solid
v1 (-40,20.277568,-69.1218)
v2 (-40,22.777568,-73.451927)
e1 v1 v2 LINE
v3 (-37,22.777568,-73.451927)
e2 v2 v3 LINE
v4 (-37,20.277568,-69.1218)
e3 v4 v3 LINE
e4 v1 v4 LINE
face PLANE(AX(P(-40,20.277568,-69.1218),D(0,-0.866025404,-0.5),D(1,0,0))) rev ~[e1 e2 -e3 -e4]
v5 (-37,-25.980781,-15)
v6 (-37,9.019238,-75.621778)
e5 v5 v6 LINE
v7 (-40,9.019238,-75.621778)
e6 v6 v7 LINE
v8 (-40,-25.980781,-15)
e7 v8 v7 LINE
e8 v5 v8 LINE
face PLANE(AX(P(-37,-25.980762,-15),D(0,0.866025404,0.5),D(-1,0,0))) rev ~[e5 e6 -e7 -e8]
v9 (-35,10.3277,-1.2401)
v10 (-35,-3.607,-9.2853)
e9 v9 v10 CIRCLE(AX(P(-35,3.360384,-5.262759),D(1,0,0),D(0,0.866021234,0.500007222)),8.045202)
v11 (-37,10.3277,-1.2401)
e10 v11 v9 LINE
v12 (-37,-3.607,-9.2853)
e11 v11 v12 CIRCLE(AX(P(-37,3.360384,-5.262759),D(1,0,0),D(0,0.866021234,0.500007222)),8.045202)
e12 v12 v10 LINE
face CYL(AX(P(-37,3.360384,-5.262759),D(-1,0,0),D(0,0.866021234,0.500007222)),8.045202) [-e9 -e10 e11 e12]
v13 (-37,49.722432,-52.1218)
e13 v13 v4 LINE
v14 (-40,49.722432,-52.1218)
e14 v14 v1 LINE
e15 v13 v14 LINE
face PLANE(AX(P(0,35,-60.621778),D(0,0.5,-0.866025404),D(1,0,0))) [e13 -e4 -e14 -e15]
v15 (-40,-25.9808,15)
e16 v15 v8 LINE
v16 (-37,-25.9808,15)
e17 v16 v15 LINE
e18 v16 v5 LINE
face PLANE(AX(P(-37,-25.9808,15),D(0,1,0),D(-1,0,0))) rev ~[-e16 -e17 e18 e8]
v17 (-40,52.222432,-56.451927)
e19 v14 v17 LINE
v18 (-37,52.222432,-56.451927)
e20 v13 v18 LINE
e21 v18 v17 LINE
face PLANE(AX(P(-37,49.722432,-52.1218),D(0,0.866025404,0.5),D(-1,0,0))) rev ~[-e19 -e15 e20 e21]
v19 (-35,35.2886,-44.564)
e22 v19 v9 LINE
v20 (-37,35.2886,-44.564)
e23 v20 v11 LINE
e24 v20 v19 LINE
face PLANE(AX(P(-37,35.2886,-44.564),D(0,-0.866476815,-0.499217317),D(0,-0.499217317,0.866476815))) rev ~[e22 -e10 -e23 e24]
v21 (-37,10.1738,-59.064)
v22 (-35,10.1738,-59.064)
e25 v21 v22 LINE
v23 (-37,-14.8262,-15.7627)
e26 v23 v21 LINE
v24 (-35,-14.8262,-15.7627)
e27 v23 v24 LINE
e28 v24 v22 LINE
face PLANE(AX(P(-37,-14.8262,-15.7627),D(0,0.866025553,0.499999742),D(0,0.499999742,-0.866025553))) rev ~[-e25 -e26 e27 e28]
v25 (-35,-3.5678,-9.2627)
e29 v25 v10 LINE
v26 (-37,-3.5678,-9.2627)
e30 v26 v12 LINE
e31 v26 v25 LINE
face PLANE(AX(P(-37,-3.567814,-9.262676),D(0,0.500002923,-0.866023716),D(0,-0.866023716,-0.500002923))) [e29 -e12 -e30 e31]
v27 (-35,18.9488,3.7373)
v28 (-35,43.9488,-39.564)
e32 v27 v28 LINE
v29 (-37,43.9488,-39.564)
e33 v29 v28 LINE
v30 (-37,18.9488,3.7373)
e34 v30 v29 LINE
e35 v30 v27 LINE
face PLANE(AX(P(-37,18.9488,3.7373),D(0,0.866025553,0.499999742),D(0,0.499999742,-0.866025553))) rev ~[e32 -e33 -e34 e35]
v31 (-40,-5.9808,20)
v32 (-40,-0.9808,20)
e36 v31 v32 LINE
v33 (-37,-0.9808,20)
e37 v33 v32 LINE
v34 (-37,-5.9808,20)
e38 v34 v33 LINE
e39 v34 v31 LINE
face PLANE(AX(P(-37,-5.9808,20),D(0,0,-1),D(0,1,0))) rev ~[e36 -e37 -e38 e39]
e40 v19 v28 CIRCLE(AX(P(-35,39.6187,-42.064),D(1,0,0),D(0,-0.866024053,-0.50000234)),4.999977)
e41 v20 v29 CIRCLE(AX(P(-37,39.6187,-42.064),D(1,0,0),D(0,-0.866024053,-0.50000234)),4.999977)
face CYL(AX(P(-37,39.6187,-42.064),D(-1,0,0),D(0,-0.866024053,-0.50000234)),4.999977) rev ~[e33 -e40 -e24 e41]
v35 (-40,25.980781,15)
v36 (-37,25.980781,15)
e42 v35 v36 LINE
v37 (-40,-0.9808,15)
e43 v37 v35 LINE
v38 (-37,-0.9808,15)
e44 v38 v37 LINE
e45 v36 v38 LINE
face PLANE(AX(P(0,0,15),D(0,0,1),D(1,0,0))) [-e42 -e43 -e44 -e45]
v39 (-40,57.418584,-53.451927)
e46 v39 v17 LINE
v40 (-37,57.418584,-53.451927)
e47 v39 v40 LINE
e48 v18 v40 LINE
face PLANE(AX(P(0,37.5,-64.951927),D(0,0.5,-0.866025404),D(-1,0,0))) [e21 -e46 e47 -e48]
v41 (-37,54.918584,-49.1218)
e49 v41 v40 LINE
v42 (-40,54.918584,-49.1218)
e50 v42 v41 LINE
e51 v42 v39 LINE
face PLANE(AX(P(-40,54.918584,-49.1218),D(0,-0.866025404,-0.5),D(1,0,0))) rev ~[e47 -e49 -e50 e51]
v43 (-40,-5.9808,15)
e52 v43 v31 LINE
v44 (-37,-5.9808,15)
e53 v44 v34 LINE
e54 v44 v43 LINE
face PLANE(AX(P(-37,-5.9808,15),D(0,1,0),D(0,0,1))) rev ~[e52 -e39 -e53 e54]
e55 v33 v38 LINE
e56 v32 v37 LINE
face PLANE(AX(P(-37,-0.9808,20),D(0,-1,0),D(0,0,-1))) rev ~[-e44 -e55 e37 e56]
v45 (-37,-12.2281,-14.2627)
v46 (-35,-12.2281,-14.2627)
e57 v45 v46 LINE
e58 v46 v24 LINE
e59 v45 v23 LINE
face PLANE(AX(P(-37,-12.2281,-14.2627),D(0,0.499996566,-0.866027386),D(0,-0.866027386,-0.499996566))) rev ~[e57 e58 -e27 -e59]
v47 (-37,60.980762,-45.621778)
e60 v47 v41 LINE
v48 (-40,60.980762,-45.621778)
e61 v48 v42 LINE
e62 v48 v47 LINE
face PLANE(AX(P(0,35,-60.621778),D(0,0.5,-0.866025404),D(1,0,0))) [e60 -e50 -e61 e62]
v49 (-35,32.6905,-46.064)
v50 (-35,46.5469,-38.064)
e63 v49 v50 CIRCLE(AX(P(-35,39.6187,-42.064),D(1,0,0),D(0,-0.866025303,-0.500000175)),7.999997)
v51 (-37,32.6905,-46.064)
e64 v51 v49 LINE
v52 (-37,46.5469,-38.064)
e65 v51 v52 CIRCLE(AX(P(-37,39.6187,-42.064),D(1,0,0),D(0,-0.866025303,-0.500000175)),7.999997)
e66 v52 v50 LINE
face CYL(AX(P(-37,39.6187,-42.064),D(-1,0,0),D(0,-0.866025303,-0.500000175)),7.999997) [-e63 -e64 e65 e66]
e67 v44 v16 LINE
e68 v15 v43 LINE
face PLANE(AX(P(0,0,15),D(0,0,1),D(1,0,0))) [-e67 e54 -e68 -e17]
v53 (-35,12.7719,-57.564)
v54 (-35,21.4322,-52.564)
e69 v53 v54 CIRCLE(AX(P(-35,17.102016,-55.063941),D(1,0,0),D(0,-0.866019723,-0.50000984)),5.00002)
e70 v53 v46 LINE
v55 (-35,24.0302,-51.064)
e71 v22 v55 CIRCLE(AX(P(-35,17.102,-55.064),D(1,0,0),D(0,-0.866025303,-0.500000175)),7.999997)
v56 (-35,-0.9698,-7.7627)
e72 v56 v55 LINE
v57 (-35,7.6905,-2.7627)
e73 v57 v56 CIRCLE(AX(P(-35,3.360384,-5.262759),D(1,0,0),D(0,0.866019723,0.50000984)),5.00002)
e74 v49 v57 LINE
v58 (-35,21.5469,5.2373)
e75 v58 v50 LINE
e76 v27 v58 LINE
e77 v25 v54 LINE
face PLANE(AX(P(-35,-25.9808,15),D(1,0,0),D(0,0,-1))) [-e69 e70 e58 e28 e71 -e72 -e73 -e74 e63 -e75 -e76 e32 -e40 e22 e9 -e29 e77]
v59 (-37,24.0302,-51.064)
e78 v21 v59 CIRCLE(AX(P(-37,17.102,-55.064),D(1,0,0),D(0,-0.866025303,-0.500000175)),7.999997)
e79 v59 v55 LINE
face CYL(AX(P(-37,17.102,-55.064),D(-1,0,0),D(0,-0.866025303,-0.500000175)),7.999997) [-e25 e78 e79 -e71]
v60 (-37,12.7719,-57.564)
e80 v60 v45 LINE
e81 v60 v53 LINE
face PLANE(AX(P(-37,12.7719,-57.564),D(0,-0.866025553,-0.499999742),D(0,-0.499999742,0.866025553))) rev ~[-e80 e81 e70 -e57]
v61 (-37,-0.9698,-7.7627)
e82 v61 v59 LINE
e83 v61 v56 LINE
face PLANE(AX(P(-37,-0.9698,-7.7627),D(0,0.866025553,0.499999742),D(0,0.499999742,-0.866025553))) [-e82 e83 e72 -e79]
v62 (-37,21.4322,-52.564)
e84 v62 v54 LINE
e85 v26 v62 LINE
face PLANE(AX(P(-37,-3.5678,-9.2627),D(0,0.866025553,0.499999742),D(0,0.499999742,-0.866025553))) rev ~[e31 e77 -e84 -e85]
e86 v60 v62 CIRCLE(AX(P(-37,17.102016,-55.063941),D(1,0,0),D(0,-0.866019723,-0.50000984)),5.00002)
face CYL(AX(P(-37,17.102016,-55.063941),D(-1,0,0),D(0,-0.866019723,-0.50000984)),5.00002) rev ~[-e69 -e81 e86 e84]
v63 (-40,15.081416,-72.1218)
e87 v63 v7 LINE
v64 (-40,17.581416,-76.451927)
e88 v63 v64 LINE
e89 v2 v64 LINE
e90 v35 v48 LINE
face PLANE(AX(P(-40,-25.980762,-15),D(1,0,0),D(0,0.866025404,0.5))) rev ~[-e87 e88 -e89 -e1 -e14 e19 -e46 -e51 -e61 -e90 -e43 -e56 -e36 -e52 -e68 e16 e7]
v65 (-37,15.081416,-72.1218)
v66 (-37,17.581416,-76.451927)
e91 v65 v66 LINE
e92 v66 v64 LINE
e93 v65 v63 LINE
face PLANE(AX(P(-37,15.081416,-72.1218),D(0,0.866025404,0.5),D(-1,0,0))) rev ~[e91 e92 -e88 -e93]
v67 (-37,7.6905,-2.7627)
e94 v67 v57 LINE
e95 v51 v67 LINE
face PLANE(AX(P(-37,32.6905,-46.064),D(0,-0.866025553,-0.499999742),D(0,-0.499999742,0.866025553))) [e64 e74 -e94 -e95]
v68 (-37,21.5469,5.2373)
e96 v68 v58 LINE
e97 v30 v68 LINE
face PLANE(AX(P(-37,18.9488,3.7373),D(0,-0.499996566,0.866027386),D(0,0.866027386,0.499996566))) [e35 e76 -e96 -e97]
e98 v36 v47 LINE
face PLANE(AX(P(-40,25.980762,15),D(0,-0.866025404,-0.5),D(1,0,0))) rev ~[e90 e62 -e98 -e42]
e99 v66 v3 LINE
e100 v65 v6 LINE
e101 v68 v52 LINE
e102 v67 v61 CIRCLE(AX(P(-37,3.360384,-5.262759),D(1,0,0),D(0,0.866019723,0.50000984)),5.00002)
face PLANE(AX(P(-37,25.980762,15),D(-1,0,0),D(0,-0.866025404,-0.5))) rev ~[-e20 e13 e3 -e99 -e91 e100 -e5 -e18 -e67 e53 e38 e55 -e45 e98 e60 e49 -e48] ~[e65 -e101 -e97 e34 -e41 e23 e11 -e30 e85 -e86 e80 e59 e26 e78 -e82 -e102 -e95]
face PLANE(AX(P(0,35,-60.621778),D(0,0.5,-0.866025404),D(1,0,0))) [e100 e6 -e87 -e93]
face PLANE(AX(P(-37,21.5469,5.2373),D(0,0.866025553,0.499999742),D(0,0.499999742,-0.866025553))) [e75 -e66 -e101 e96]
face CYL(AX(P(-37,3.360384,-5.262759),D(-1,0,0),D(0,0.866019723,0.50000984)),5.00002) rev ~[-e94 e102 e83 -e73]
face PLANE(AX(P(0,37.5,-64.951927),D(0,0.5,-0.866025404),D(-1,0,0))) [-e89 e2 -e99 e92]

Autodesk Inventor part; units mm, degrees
ref_plane "Plan de construction1" through (0, 0, 0) normal (0, 0.5, -0.8660254) x (1, 0, 0)
sketch "Esquisse1" plane through (0, 0, 0) normal (0, 0.5, -0.8660254) x (1, 0, 0)
  line L0 (-40, 0) -> (-40, -30)
  line L1 (-40, -30) -> (-37, -30)
  line L2 (-40, -30) -> (-37, -30)
  line L3 (-37, -30) -> (-37, 30)
  line L4 (-37, 30) -> (-40, 30)
  line L5 (-40, 30) -> (-40, -30)
  point P0 (0, 0)
  point P1 (-37, 0)
  point P2 (-37, -30)
  dimension "d2" = 30
  dimension "d3" = 3
  dimension "d4" = 60
  dimension "d49" = 37
  dimension "d50" = 40
extrude "Extrusion1" add sketch "Esquisse1" along normal blind 70
ref_plane "Plan de construction2" through (0, 0, 15) normal (0, 0, 1) x (1, 0, 0)
sketch "Esquisse2" plane through (0, 0, 15) normal (0, 0, 1) x (1, 0, 0)
  line L0 (-40, -25.9808) -> (-40, 25.9808) projected
  line L1 (-37, 25.9808) -> (-37, -25.9808) projected
  line L2 (-40, 25.9808) -> (-37, 25.9808) projected
  line L3 (-37, -25.9808) -> (-40, -25.9808) projected
  line L4 (-37, 60.9808) -> (-37, 9.0192) projected
  line L5 (-40, 25.9808) -> (-37, 25.9808)
  line L6 (-37, 25.9808) -> (-37, 35.9808)
  line L7 (-37, 35.9808) -> (-40, 35.9808)
  line L8 (-40, 35.9808) -> (-40, 25.9808)
  point P0 (0, 0)
  point P1 (37, 25.9808)
  dimension "d46" = 10
extrude "Extrusion2" add sketch "Esquisse2" against normal blind 30 contours L0 L2 L1 L3
ref_plane "Plan de construction3" through (-37, -25.9808, 15) normal (1, 0, 0) x (0, 0, -1)
sketch "Esquisse3" plane through (-37, -25.9808, 15) normal (1, 0, 0) x (0, 0, -1)
  line L0 (0, 0) -> (0, 20)
  line L1 (0, 51.9615) -> (0, 0) projected
  line L2 (0, 20) -> (-5, 20)
  line L3 (-5, 20) -> (-5, 25)
  line L4 (-5, 25) -> (0, 25)
  point P0 (15, 25.9808)
  dimension "d16" = 20
  dimension "d17" = 5
extrude "Extrusion3" add sketch "Esquisse3" against normal up to surface (3 mm away)
sketch "Esquisse13" plane through (0, 35, -60.6218) normal (0, 0.5, -0.8660254) x (-1, 0, 0)
  line L0 (37, 30) -> (37, -30) projected
  line L1 (37, 0) -> (37, 20)
  line L2 (37, 20) -> (40, 20)
  line L3 (40, -30) -> (40, 30) projected
  line L4 (40, 20) -> (40, 23)
  line L5 (40, 23) -> (37, 23)
  line L6 (37, 23) -> (37, 17)
  line L7 (37, 17) -> (40, 17)
  line L8 (40, 17) -> (40, 20)
  line L9 (37, 0) -> (37, -20)
  line L10 (37, -20) -> (40, -20)
  line L11 (40, -20) -> (40, -17)
  line L12 (40, -17) -> (37, -17)
  line L13 (37, -17) -> (37, -23)
  line L14 (37, -23) -> (40, -23)
  line L15 (40, -23) -> (40, -20)
  point P0 (0, 0)
  point P1 (37, 23)
  point P2 (37, 17)
  point P3 (40, 17)
  dimension "d53" = 20
  dimension "d54" = 3
  dimension "d55" = 6
  dimension "d56" = 20
  dimension "d57" = 3
  dimension "d58" = 6
extrude "Extrusion12" add sketch "Esquisse13" along normal blind 5 contours L5 L3 L2 L0 | L2 L3 L7 L0 | L12 L3 L10 L0 | L10 L3 L14 L0
sketch "Esquisse14" plane through (-37, -25.9808, 15) normal (1, 0, 0) x (0, 0, -1)
  line L0 (11.2627, 44.9296) -> (54.564, 69.9296)
  line L1 (11.2627, 44.9296) -> (61.2627, 44.9296) construction
  arc A0 (59.564, 61.2694) -> (54.564, 69.9296) centre (57.064, 65.5995) ccw
  line L2 (59.564, 61.2694) -> (16.2401, 36.3085)
  line L3 (26.3922, 19.4858) -> (76.3922, 19.4858) construction
  line L4 (11.2627, 44.9296) -> (9.7627, 47.5277)
  line L5 (9.7627, 47.5277) -> (53.064, 72.5277)
  line L6 (59.564, 61.2694) -> (61.064, 58.6713)
  line L7 (61.064, 58.6713) -> (17.7627, 33.6713)
  line L8 (17.7627, 33.6713) -> (22.7627, 25.011)
  line L9 (17.7627, 33.6713) -> (27.7627, 33.6713) construction
  line L10 (22.7627, 25.011) -> (66.064, 50.011)
  line L11 (17.7627, 33.6713) -> (22.7627, 25.011)
  arc A1 (17.7627, 33.6713) -> (22.7627, 25.011) centre (20.2627, 29.3412) ccw
  line L12 (22.7627, 25.011) -> (24.2627, 22.413)
  line L13 (24.2627, 22.413) -> (67.564, 47.413)
  arc A2 (16.2401, 36.3085) -> (24.2853, 22.3738) centre (20.2627, 29.3412) ccw
  arc A3 (61.064, 58.6713) -> (53.064, 72.5277) centre (57.064, 65.5995) ccw
  line L14 (67.564, 47.413) -> (72.564, 38.7527)
  line L15 (67.564, 47.413) -> (77.564, 47.413) construction
  line L16 (72.564, 38.7527) -> (29.2627, 13.7527)
  line L17 (29.2627, 13.7527) -> (30.7627, 11.1546)
  line L18 (30.7627, 11.1546) -> (74.064, 36.1546)
  arc A4 (72.564, 38.7527) -> (67.564, 47.413) centre (70.064, 43.0828) ccw
  arc A5 (74.064, 36.1546) -> (66.064, 50.011) centre (70.064, 43.0828) ccw
  line L19 (16.2401, 36.3085) -> (17.7627, 33.6713)
  line L20 (22.7627, 25.011) -> (24.2853, 22.3738)
  line L21 (59.564, 61.2694) -> (61.064, 58.6713)
  dimension "d61" = 50
  dimension "d62" = 30
  dimension "d63" = 10
  dimension "d64" = 5
  dimension "d71" = 3
  dimension "d72" = 3
  dimension "d75" = 10
  dimension "d76" = 60
  dimension "d78" = 90
  dimension "d79" = 3
  dimension "d80" = 10
  dimension "d81" = 60
  dimension "d82" = 50
  dimension "d83" = 90
  dimension "d84" = 3
  dimension "d85" = 5
extrude "Extrusion13" add sketch "Esquisse14" along normal blind 2 contours L4 L5 A3 L6 A0 L0 | L6 L7 L19 L2 | L19 A1 L12 L20 A2 | L12 L10 A5 L18 L17 L16 A4 L13
properties part number "autour hélice"
